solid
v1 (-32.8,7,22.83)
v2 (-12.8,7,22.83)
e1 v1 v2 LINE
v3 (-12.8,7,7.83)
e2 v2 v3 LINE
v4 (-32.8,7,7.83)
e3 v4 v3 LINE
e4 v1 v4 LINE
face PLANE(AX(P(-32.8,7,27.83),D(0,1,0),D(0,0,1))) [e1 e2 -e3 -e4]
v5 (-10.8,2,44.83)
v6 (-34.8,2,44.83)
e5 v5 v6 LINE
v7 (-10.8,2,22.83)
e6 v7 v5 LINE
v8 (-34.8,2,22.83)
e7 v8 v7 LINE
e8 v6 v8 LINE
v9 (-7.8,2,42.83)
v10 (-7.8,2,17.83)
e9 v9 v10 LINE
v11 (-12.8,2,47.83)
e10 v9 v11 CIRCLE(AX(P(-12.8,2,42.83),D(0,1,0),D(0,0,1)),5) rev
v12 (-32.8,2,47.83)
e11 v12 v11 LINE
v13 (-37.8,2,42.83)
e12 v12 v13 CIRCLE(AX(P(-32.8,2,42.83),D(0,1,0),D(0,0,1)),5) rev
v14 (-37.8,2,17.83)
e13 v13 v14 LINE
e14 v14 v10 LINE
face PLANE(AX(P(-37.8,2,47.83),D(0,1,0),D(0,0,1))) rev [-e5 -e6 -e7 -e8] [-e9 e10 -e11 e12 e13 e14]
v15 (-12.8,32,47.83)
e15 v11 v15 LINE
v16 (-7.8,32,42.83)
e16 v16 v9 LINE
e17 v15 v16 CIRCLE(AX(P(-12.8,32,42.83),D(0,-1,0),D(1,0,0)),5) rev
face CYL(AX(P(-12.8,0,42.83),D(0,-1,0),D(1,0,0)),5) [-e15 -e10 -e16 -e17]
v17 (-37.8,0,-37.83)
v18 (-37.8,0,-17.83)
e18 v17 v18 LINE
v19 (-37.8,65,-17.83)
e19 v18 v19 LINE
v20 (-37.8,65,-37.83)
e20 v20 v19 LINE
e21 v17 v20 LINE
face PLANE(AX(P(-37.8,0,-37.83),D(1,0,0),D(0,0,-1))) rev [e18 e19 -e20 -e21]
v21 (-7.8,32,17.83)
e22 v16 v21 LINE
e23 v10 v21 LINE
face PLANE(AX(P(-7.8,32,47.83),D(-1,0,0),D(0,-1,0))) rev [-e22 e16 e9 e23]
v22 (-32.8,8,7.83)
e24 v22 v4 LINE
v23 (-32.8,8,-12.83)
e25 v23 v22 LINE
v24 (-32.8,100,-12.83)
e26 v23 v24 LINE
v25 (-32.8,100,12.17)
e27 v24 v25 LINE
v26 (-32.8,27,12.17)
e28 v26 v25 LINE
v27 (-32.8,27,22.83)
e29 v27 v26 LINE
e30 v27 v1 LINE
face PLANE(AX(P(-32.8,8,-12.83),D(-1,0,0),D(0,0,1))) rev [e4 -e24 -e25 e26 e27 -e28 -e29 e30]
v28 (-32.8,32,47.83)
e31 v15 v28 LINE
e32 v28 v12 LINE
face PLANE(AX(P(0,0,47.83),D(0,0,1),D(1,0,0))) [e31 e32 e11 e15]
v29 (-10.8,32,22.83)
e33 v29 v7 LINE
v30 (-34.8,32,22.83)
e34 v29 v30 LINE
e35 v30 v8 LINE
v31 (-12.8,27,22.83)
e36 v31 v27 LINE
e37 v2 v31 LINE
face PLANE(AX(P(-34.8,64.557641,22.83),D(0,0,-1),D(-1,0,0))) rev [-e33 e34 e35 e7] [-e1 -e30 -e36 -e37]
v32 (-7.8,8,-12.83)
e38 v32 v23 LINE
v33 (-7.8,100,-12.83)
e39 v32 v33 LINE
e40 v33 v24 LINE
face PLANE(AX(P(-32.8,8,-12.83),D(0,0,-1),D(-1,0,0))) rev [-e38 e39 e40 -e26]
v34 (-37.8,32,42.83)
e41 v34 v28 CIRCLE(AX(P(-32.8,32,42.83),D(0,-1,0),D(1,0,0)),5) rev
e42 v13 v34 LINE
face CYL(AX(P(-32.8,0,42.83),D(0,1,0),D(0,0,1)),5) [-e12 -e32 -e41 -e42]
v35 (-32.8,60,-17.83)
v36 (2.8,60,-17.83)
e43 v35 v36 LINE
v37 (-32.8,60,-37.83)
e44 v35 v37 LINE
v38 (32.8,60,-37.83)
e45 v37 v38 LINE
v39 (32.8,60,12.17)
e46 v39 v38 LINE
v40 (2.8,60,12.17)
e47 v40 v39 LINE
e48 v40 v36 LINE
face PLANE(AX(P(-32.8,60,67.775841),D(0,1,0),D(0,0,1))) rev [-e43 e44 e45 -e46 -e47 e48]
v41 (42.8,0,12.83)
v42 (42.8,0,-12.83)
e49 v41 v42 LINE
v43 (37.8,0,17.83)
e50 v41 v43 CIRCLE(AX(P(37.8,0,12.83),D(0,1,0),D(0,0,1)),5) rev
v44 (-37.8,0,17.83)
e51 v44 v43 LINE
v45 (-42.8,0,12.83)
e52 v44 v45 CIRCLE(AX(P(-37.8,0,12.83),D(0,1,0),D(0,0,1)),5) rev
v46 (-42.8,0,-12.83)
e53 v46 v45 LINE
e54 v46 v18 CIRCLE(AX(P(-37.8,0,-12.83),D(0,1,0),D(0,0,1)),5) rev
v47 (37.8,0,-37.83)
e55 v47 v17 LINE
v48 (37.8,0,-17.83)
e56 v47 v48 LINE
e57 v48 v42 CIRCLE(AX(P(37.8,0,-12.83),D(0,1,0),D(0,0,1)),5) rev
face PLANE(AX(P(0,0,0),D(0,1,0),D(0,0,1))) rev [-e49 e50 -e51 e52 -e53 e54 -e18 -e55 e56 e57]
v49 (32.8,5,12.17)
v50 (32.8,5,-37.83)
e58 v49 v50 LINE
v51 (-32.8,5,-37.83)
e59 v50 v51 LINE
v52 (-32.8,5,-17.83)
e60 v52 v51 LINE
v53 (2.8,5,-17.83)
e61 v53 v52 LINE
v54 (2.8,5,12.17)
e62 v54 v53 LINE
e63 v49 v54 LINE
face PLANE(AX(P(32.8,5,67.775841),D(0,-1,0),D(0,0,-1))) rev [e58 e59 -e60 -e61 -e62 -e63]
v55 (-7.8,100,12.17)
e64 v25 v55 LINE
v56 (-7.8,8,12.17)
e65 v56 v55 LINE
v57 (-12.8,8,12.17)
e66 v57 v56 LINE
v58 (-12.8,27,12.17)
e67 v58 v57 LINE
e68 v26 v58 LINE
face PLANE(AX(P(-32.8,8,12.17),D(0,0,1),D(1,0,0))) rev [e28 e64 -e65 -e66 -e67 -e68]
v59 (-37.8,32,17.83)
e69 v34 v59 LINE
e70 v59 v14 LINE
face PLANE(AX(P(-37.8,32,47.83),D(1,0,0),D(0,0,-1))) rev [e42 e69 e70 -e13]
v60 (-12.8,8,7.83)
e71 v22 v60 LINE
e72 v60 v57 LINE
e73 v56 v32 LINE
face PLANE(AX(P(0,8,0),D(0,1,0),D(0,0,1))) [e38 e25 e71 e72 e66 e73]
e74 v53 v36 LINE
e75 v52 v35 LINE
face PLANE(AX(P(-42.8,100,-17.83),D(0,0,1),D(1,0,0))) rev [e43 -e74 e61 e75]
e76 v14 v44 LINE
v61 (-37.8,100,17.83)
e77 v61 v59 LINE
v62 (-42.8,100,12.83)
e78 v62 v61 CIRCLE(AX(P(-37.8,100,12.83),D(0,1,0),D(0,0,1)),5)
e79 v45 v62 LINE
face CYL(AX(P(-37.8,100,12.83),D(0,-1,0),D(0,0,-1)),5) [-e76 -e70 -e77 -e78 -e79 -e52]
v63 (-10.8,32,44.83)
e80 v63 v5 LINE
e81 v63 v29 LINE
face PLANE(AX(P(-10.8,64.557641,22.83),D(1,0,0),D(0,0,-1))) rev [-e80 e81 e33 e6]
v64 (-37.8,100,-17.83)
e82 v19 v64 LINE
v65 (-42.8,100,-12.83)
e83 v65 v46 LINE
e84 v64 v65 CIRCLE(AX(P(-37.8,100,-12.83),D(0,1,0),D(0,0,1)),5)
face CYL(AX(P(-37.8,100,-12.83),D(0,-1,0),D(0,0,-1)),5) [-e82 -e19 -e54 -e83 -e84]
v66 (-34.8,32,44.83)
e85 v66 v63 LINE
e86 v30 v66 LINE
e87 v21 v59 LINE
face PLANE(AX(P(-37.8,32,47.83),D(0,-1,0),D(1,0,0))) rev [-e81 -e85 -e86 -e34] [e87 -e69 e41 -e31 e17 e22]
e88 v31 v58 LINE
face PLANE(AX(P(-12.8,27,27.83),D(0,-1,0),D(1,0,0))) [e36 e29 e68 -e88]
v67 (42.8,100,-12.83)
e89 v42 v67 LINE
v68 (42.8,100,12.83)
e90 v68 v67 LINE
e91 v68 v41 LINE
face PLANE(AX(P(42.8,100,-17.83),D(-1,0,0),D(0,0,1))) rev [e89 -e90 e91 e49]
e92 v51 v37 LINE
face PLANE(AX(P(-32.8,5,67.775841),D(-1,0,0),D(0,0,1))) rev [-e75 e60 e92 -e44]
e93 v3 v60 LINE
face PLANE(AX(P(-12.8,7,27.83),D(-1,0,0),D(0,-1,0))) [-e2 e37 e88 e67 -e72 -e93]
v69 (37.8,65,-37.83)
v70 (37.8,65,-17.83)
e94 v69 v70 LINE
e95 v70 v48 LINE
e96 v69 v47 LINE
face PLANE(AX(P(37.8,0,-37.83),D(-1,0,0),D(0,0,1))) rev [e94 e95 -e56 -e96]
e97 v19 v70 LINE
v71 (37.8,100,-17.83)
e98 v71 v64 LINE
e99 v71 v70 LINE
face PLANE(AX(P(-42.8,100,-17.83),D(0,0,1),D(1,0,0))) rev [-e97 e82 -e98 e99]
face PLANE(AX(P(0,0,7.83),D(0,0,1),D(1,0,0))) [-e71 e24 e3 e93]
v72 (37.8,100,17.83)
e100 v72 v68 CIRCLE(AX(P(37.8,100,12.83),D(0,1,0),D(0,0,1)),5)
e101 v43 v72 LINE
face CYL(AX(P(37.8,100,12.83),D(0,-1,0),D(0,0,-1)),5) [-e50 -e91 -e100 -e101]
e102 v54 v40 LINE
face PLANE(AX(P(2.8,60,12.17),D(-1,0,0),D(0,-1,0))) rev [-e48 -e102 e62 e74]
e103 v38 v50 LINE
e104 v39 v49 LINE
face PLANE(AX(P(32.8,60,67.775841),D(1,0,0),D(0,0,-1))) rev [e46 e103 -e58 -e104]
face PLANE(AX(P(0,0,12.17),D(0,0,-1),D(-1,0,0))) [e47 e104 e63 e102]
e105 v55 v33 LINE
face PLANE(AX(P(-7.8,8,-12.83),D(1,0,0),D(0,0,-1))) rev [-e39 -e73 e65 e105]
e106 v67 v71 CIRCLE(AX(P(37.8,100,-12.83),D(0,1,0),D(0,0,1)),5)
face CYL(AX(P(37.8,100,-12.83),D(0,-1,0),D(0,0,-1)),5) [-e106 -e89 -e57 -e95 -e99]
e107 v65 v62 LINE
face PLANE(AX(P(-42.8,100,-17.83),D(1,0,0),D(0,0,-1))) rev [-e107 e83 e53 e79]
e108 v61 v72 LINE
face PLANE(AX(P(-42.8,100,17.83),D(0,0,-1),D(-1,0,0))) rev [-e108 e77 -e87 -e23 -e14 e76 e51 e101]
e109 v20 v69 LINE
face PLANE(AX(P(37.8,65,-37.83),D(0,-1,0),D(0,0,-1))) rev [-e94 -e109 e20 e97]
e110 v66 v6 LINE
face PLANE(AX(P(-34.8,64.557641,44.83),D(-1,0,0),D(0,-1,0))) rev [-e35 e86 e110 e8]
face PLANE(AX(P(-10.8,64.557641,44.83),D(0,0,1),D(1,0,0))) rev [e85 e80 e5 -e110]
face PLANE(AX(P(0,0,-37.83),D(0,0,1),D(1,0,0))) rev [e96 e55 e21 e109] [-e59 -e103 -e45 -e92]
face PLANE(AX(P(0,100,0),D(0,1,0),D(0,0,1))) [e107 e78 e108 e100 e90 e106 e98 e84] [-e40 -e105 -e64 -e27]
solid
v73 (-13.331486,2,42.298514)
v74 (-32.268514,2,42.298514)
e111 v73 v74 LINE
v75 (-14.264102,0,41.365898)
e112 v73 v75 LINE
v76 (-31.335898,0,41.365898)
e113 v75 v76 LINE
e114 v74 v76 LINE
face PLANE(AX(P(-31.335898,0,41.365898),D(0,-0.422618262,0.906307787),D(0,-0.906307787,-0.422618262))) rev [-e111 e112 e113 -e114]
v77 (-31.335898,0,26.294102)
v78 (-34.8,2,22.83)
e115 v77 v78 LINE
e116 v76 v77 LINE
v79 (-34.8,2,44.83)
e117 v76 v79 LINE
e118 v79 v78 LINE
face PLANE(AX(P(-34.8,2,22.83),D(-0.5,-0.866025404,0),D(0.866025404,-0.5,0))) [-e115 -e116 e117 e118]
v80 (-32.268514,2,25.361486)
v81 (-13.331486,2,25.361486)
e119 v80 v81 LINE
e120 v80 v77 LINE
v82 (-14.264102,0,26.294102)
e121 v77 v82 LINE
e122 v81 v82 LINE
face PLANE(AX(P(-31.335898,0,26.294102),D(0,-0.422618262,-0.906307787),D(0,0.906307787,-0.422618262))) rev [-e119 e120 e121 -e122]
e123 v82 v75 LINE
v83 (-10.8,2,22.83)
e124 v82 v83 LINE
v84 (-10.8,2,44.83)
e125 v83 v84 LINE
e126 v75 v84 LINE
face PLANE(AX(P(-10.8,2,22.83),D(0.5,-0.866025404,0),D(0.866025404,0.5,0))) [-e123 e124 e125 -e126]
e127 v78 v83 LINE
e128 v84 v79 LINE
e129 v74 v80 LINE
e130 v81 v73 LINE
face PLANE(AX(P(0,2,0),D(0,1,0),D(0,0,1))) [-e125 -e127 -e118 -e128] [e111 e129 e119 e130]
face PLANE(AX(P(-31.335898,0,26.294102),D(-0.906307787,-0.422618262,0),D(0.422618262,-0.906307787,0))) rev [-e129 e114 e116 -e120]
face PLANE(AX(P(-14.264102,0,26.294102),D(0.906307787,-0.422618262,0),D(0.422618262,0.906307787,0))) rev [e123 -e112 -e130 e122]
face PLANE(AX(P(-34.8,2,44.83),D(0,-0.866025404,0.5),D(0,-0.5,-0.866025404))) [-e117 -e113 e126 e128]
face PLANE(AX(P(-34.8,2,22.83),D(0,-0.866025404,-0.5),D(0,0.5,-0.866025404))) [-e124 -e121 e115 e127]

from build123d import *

# Parameters (mm, degrees)
CROQUIS1_W                 = 85.6
CROQUIS1_H                 = 35.66
SALIENTE_EXTRUIR1_DEPTH    = 100
CROQUIS2_W                 = 25
CROQUIS2_H                 = 25
CORTAR_EXTRUIR1_DEPTH      = 92
CROQUIS3_W                 = 30
CROQUIS3_H                 = 30
SALIENTE_EXTRUIR2_DEPTH    = 30
CROQUIS4_W                 = 24
CROQUIS4_H                 = 22
CORTAR_EXTRUIR2_DEPTH      = 30
REDONDEO1_R                = 5
CROQUIS8_W                 = 75.6
CROQUIS8_H                 = 65
SALIENTE_EXTRUIR3_DEPTH    = 20
CORTAR_EXTRUIR3_DEPTH      = 10
CORTAR_EXTRUIR3_DEPTH_BACK = 10
CROQUIS6_W                 = 20
CROQUIS6_H                 = 20
CROQUIS9_W                 = 24
CROQUIS9_H                 = 22
SALIENTE_EXTRUIR4_DEPTH    = 2
SALIENTE_EXTRUIR4_TAPER    = 60
CROQUIS10_W                = 17.07179677
CROQUIS10_H                = 15.07179677
CORTAR_EXTRUIR4_DEPTH      = 2
CORTAR_EXTRUIR4_DRAFT      = 25
CROQUIS12_W                = 65.6
CROQUIS12_H                = 55
CORTAR_EXTRUIR6_DEPTH      = 20
CROQUIS17_W                = 30
CROQUIS17_H                = 55
CORTAR_EXTRUIR11_DEPTH     = 30


with BuildPart() as part:
    # Croquis1 → Saliente-Extruir1 (new body)
    with BuildSketch(Plane(origin=(0, 0, 0), x_dir=(1, 0, 0), z_dir=(0, 1, 0))):
        Rectangle(CROQUIS1_W, CROQUIS1_H)
    extrude(amount=SALIENTE_EXTRUIR1_DEPTH)

    # Croquis2 → Cortar-Extruir1 (cut)
    with BuildSketch(Plane(origin=(0, 100, 0), x_dir=(1, 0, 0), z_dir=(0, 1, 0))):
        with Locations((-20.3, 0.33)):
            Rectangle(CROQUIS2_W, CROQUIS2_H)
    extrude(amount=-CORTAR_EXTRUIR1_DEPTH, mode=Mode.SUBTRACT)

    # Croquis3 → Saliente-Extruir2 (add)
    with BuildSketch(Plane.XY.offset(17.83)):
        with Locations((-22.8, 17)):
            Rectangle(CROQUIS3_W, CROQUIS3_H)
    extrude(amount=SALIENTE_EXTRUIR2_DEPTH)

    # Croquis4 → Cortar-Extruir2 (cut)
    with BuildSketch(Plane.XZ.offset(-2)):
        with Locations((-22.8, 33.83)):
            Rectangle(CROQUIS4_W, CROQUIS4_H)
    extrude(amount=-CORTAR_EXTRUIR2_DEPTH, mode=Mode.SUBTRACT)

    # Redondeo1
    redondeo1_edges = [part.edges().sort_by_distance(p)[0] for p in [
        (-7.8, 17, 47.83),
        (-37.8, 17, 47.83),
        (42.8, 50, 17.83),
        (-42.8, 50, 17.83),
        (-42.8, 50, -17.83),
        (42.8, 50, -17.83),
    ]]
    fillet(redondeo1_edges, radius=REDONDEO1_R - 0.0001)  # a hair under: the kernel refuses the full size

    # Croquis8 → Saliente-Extruir3 (add)
    with BuildSketch(Plane(origin=(0, 0, -17.83), x_dir=(-1, 0, 0), z_dir=(0, 0, -1))):
        with Locations((0, 32.5)):
            Rectangle(CROQUIS8_W, CROQUIS8_H)
    extrude(amount=SALIENTE_EXTRUIR3_DEPTH)

    # Croquis6 → Cortar-Extruir3 (cut, two sides: drawn at the far end of the back side and taken through both)
    with BuildSketch(Plane.XY.offset(17.83).offset(-CORTAR_EXTRUIR3_DEPTH_BACK)):
        with Locations((-22.8, 17)):
            Rectangle(CROQUIS6_W, CROQUIS6_H)
    extrude(amount=CORTAR_EXTRUIR3_DEPTH + CORTAR_EXTRUIR3_DEPTH_BACK, mode=Mode.SUBTRACT)

    # Croquis12 → Cortar-Extruir6 (cut)
    with BuildSketch(Plane(origin=(0, 0, -37.83), x_dir=(-1, 0, 0), z_dir=(0, 0, -1))):
        with Locations((0, 32.5)):
            Rectangle(CROQUIS12_W, CROQUIS12_H)
    extrude(amount=-CORTAR_EXTRUIR6_DEPTH, mode=Mode.SUBTRACT)

    # Croquis17 → Cortar-Extruir11 (cut)
    with BuildSketch(Plane(origin=(0, 0, -17.83), x_dir=(-1, 0, 0), z_dir=(0, 0, -1))):
        with Locations((-17.8, 32.5)):
            Rectangle(CROQUIS17_W, CROQUIS17_H)
    extrude(amount=-CORTAR_EXTRUIR11_DEPTH, mode=Mode.SUBTRACT)


with BuildPart() as body_2:
    # Croquis9 → Saliente-Extruir4 (new body)
    with BuildSketch(Plane.XZ.offset(-2)):
        with Locations((-22.8, 33.83)):
            Rectangle(CROQUIS9_W, CROQUIS9_H)
    extrude(amount=SALIENTE_EXTRUIR4_DEPTH, taper=SALIENTE_EXTRUIR4_TAPER)


with BuildPart() as cortar_extruir4_tool:
    # Croquis10 → Cortar-Extruir4 (with draft: the straight prism first)
    with BuildSketch(Plane.XZ):
        with Locations((-22.8, 33.83)):
            Rectangle(CROQUIS10_W, CROQUIS10_H)
    extrude(amount=-CORTAR_EXTRUIR4_DEPTH)
    # Cortar-Extruir4: the draft: its side faces are tilted about the plane it starts from
    cortar_extruir4_sides = [cortar_extruir4_tool.faces().sort_by_distance(p)[0] for p in [
        (-22.8, 1, 26.294101615),
        (-14.264101615, 1, 33.83),
        (-22.8, 1, 41.365898385),
        (-31.335898385, 1, 33.83),
    ]]
    draft(cortar_extruir4_sides, Plane.XZ, CORTAR_EXTRUIR4_DRAFT)


with BuildPart() as body_2_1:
    add(body_2.part)

    # Cortar-Extruir4: cut by cortar_extruir4_tool
    add(cortar_extruir4_tool.part, mode=Mode.SUBTRACT)


solid = Compound([part.part, body_2_1.part])
